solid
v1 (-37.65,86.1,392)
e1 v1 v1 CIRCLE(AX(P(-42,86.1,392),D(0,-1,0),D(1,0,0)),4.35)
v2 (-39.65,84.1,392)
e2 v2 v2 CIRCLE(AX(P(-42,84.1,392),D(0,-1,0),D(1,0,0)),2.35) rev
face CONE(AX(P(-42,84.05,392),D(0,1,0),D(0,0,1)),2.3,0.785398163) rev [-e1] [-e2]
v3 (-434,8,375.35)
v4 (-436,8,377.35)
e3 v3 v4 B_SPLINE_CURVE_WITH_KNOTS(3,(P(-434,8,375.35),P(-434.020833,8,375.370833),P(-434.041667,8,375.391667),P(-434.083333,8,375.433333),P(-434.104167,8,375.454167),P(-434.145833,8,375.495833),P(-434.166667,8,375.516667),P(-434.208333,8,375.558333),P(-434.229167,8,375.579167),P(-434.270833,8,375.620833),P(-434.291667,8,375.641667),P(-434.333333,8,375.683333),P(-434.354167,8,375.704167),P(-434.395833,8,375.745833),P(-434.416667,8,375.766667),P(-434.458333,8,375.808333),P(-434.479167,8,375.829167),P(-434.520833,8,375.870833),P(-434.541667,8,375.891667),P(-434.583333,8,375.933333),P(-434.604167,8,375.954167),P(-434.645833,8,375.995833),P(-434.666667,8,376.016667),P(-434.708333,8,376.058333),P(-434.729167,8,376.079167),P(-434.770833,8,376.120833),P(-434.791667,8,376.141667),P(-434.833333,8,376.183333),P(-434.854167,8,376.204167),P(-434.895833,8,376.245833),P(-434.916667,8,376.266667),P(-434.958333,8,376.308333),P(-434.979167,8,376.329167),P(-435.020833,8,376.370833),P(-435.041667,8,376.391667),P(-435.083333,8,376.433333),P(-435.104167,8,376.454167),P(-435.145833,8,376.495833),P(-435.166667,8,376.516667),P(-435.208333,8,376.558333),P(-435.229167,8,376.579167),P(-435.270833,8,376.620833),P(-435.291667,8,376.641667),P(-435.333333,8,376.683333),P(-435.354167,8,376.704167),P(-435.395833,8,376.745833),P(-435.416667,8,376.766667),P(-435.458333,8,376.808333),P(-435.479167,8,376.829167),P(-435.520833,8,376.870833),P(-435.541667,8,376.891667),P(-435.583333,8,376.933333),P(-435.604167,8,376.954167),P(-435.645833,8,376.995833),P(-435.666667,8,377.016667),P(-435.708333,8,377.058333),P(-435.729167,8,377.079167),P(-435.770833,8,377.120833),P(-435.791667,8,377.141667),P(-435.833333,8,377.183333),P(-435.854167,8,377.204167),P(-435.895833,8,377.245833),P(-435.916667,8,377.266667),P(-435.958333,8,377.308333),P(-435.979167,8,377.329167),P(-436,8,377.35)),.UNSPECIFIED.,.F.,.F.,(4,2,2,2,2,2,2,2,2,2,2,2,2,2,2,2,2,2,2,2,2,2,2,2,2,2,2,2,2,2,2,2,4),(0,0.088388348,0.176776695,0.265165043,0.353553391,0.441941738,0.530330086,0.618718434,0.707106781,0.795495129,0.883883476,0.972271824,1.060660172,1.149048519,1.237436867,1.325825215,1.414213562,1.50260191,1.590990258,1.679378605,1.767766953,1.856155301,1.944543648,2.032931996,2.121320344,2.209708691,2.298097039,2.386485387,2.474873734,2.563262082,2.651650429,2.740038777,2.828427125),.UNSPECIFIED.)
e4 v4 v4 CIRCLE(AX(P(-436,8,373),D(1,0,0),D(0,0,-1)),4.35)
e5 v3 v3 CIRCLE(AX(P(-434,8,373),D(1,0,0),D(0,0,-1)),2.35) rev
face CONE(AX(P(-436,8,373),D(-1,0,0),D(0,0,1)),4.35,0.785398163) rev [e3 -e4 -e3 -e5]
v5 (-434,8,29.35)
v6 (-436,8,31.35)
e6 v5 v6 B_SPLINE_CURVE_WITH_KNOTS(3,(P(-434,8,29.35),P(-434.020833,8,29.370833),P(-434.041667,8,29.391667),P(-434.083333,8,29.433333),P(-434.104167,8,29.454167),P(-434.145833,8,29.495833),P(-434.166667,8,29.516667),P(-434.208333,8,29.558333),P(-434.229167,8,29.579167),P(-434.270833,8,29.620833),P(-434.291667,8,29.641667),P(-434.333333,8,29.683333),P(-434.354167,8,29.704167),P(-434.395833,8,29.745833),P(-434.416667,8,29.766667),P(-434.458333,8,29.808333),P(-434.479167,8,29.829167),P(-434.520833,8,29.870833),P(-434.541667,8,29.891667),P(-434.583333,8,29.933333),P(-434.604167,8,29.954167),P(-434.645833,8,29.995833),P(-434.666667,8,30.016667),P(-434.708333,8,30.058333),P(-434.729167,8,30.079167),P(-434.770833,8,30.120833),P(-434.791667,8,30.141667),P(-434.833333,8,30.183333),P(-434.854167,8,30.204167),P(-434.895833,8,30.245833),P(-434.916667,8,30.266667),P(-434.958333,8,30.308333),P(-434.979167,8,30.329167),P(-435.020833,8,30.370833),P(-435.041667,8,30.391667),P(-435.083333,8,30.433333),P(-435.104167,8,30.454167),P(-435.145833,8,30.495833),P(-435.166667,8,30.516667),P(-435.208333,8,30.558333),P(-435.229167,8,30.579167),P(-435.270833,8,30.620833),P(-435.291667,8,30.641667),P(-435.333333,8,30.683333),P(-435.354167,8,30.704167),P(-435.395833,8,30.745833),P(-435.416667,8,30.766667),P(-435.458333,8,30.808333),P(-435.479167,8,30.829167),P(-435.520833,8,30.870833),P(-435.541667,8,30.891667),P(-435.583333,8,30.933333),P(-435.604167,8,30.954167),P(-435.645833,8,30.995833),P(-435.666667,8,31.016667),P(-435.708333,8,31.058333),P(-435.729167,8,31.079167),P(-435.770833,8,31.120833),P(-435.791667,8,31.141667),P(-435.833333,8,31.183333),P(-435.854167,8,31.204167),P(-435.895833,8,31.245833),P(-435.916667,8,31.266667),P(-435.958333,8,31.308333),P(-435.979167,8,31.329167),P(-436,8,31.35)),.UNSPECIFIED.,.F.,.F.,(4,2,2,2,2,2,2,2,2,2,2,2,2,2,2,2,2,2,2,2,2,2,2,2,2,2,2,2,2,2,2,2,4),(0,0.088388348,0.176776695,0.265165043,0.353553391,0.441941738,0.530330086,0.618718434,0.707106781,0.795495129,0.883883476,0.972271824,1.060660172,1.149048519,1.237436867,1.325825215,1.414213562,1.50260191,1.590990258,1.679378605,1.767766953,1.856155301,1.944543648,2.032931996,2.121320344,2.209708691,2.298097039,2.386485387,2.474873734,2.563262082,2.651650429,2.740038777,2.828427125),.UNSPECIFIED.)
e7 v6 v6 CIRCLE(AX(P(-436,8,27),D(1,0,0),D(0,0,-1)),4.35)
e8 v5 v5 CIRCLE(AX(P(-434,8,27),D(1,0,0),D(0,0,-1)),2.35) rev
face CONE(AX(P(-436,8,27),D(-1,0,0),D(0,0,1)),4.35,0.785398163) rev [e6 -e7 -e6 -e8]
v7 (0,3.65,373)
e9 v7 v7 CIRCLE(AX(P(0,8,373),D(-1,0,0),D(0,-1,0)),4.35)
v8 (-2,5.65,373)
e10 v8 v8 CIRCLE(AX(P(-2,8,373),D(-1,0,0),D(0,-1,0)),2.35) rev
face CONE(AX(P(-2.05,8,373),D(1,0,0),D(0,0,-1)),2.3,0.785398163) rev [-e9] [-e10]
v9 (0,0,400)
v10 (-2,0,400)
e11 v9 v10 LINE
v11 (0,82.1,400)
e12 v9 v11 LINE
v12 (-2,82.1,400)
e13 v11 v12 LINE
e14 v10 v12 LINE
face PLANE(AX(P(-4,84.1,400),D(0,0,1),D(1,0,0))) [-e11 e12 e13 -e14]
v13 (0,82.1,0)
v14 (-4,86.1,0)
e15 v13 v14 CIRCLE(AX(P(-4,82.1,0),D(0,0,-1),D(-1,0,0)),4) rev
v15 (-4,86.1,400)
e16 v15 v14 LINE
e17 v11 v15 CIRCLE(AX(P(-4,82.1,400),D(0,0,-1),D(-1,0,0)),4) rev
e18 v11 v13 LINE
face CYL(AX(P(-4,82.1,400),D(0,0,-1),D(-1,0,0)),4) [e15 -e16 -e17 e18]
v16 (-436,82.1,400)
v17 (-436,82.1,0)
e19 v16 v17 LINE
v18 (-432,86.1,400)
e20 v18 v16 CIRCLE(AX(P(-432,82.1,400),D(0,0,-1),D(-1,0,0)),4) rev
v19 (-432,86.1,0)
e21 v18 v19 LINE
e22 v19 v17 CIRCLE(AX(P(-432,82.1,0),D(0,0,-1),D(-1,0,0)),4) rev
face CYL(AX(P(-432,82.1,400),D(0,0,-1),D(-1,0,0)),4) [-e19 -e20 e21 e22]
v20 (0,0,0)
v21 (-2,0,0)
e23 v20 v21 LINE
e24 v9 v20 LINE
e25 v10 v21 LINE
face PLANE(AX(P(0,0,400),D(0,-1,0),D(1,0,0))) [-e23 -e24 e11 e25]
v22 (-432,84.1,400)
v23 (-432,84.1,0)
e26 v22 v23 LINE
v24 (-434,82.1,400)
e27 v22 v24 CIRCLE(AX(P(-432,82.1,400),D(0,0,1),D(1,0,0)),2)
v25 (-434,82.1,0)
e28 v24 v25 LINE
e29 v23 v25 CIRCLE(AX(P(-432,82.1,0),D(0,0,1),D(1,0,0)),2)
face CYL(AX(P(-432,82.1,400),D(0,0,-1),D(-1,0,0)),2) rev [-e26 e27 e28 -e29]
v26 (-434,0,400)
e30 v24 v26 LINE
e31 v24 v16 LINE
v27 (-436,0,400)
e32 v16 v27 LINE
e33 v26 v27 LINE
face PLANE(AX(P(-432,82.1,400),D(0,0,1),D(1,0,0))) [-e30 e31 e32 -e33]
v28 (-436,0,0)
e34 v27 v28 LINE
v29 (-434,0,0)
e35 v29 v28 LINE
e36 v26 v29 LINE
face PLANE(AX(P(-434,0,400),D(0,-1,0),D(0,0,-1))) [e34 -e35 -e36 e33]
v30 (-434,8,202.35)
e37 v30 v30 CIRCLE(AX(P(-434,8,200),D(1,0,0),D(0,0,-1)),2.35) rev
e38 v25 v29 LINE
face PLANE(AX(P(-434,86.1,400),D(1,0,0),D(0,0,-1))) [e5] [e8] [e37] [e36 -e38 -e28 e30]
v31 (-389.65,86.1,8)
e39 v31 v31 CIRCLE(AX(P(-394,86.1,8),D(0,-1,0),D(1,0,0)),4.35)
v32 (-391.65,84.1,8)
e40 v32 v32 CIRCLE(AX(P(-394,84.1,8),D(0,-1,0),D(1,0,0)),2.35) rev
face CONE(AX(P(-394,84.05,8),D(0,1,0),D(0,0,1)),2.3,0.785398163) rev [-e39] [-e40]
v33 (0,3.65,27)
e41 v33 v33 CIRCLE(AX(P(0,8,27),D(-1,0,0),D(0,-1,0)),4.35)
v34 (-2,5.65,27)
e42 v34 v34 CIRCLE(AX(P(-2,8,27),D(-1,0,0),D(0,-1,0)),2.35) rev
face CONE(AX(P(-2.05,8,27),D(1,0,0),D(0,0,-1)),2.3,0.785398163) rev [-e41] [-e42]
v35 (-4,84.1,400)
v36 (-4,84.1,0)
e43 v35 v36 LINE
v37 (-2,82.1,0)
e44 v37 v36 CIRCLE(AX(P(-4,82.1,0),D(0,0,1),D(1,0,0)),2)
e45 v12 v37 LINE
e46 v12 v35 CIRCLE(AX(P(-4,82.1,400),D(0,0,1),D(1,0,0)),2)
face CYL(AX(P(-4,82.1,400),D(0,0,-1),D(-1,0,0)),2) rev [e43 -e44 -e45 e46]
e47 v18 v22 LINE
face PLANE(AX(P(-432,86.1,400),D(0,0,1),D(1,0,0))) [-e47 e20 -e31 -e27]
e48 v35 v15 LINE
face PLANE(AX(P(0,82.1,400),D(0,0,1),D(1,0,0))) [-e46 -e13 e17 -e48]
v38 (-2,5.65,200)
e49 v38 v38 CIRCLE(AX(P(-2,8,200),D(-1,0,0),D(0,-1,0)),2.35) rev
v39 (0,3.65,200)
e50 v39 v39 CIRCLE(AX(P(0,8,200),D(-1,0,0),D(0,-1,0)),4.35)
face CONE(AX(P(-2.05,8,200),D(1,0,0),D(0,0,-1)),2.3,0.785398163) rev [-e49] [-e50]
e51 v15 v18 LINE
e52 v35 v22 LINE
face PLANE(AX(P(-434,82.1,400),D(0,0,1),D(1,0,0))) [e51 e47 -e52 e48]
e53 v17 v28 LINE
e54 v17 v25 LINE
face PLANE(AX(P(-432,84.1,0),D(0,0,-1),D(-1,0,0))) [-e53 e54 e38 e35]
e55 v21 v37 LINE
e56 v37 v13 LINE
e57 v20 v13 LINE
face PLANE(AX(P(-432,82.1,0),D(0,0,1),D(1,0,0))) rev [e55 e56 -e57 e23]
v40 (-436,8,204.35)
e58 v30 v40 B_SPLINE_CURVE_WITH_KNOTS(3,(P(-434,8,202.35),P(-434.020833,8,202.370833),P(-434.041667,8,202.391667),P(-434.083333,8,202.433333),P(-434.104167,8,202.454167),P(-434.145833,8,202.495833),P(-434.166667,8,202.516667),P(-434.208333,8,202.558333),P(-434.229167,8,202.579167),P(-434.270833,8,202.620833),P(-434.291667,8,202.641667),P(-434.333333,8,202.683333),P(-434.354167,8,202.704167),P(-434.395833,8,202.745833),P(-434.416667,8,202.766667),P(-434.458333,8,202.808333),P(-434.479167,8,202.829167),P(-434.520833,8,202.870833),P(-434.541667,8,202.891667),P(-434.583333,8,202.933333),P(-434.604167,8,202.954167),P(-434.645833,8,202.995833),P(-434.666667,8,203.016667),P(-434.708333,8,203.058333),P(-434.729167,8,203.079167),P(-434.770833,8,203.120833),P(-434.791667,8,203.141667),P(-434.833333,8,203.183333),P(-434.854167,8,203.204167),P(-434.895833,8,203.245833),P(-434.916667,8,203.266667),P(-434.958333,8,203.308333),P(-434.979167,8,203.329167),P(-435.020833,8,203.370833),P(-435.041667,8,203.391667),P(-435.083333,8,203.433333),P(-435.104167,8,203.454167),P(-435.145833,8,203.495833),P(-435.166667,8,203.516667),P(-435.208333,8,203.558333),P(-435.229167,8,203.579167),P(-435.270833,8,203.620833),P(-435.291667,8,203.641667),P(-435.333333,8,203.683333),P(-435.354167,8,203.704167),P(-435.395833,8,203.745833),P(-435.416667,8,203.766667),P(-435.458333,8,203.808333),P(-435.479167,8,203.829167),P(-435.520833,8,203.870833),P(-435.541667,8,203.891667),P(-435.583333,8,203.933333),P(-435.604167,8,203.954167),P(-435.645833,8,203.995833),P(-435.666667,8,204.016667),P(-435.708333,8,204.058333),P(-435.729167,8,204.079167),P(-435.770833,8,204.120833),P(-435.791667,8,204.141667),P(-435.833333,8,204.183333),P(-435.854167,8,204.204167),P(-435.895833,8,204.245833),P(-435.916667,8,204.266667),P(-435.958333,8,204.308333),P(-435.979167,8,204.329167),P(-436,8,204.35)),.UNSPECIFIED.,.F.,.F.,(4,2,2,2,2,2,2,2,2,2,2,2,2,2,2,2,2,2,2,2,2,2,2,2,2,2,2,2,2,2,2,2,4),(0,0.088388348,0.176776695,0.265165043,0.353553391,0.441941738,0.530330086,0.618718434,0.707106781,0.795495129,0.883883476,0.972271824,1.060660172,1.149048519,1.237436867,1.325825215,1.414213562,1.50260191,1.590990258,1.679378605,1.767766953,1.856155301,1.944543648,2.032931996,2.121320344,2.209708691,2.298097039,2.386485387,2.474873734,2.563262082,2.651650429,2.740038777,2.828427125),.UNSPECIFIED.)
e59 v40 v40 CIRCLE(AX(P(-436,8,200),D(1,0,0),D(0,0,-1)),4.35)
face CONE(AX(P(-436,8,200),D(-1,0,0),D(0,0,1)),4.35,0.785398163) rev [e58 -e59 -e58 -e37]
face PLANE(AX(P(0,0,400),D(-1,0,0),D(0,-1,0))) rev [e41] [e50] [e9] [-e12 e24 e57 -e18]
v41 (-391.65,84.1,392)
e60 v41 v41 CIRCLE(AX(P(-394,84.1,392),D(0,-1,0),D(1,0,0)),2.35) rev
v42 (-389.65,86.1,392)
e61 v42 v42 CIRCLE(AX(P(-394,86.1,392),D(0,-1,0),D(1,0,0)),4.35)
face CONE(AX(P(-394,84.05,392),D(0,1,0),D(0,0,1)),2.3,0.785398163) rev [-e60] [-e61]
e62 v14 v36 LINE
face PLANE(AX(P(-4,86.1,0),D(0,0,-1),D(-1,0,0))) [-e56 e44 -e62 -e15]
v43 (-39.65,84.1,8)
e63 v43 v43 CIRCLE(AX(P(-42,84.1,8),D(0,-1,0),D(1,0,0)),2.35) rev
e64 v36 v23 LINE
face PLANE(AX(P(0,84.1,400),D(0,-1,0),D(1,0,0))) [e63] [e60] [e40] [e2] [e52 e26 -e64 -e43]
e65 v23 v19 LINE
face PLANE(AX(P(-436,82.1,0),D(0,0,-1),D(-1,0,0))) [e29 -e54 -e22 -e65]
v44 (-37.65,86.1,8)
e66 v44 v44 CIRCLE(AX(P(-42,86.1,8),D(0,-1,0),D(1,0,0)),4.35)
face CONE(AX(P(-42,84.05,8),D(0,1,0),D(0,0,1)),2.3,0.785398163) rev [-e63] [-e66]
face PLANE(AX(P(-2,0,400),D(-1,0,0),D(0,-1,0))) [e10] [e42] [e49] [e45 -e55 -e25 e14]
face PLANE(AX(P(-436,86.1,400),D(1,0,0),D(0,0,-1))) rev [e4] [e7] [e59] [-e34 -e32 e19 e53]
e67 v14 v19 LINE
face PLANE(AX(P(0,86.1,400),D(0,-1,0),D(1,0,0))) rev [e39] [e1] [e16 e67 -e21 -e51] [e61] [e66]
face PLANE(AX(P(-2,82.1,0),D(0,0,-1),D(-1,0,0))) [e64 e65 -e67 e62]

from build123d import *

# Parameters (mm, degrees)
SM_BASE_FLANGE_1_DEPTH = 400
SKETCH_8_R             = 2.3
CUT_EXTRUDE_2_DEPTH    = 598.920738894
SKETCH_9_R             = 2.3
CUT_EXTRUDE_3_DEPTH    = 10
CHAMFER_1_SIZE         = 2.05


# Sheet-metal steps are written as plain solids
with BuildPart() as part:
    # Sketch 1 → Базовая кромка1 (new body)
    with BuildSketch(Plane.XY):
        with BuildLine():
            Line((0, 0), (0, 82.1))
            ThreePointArc((0, 82.1), (-1.171572875, 84.928427125), (-4, 86.1))
            Line((-4, 86.1), (-432, 86.1))
            ThreePointArc((-432, 86.1), (-434.828427125, 84.928427125), (-436, 82.1))
            Line((-436, 82.1), (-436, 0))
            Line((-436, 0), (-434, 0))
            Line((-434, 0), (-434, 82.1))
            ThreePointArc((-434, 82.1), (-433.414213562, 83.514213562), (-432, 84.1))
            Line((-432, 84.1), (-4, 84.1))
            ThreePointArc((-4, 84.1), (-2.585786438, 83.514213562), (-2, 82.1))
            Line((-2, 82.1), (-2, 0))
            Line((-2, 0), (0, 0))
        make_face()
    extrude(amount=SM_BASE_FLANGE_1_DEPTH)

    # Эскиз8 → Вырез-Вытянуть2 (cut, through all)
    with BuildSketch(Plane(origin=(0, 0, 0), x_dir=(0, 0, -1), z_dir=(1, 0, 0))):
        with Locations(Location((-373, 8, 0), (0, 0, 90))):
            Circle(SKETCH_8_R)
        with Locations(Location((-200, 8, 0), (0, 0, 90))):
            Circle(SKETCH_8_R)
        with Locations(Location((-27, 8, 0), (0, 0, 90))):
            Circle(SKETCH_8_R)
    extrude(amount=-CUT_EXTRUDE_2_DEPTH, mode=Mode.SUBTRACT)

    # Эскиз9 → Вырез-Вытянуть3 (cut)
    with BuildSketch(Plane(origin=(0, 86.1, 0), x_dir=(1, 0, 0), z_dir=(0, 1, 0))):
        with Locations(Location((-42, -392, 0), (0, 0, 180))):
            Circle(SKETCH_9_R)
        with Locations(Location((-394, -392, 0), (0, 0, 180))):
            Circle(SKETCH_9_R)
        with Locations(Location((-42, -8, 0), (0, 0, 180))):
            Circle(SKETCH_9_R)
        with Locations(Location((-394, -8, 0), (0, 0, 180))):
            Circle(SKETCH_9_R)
    extrude(amount=-CUT_EXTRUDE_3_DEPTH, mode=Mode.SUBTRACT)

    # Фаска1
    # the kernel refuses this chamfer: 2.05 mm, written as the material it takes off along each edge
    with BuildSketch(Plane(origin=(-436, 8, 373), x_dir=(0, 1, 0), z_dir=(0, 0, -1))) as chamfer_1_piece_1:
        Polygon((2.3 + CHAMFER_1_SIZE, 0), (2.3, CHAMFER_1_SIZE), (2.3, 0), align=None)
    revolve(axis=Axis((-436, 8, 373), (1, 0, 0)), mode=Mode.SUBTRACT)
    with BuildSketch(Plane(origin=(0, 8, 373), x_dir=(0, 1, 0), z_dir=(0, 0, -1))) as chamfer_1_piece_2:
        Polygon((2.3, -CHAMFER_1_SIZE), (2.3 + CHAMFER_1_SIZE, 0), (2.3, 0), align=None)
    revolve(axis=Axis((0, 8, 373), (1, 0, 0)), mode=Mode.SUBTRACT)
    with BuildSketch(Plane(origin=(-436, 8, 200), x_dir=(0, 1, 0), z_dir=(0, 0, -1))) as chamfer_1_piece_3:
        Polygon((2.3 + CHAMFER_1_SIZE, 0), (2.3, CHAMFER_1_SIZE), (2.3, 0), align=None)
    revolve(axis=Axis((-436, 8, 200), (1, 0, 0)), mode=Mode.SUBTRACT)
    with BuildSketch(Plane(origin=(0, 8, 200), x_dir=(0, 1, 0), z_dir=(0, 0, -1))) as chamfer_1_piece_4:
        Polygon((2.3, -CHAMFER_1_SIZE), (2.3 + CHAMFER_1_SIZE, 0), (2.3, 0), align=None)
    revolve(axis=Axis((0, 8, 200), (1, 0, 0)), mode=Mode.SUBTRACT)
    with BuildSketch(Plane(origin=(-436, 8, 27), x_dir=(0, 1, 0), z_dir=(0, 0, -1))) as chamfer_1_piece_5:
        Polygon((2.3 + CHAMFER_1_SIZE, 0), (2.3, CHAMFER_1_SIZE), (2.3, 0), align=None)
    revolve(axis=Axis((-436, 8, 27), (1, 0, 0)), mode=Mode.SUBTRACT)
    with BuildSketch(Plane(origin=(0, 8, 27), x_dir=(0, 1, 0), z_dir=(0, 0, -1))) as chamfer_1_piece_6:
        Polygon((2.3, -CHAMFER_1_SIZE), (2.3 + CHAMFER_1_SIZE, 0), (2.3, 0), align=None)
    revolve(axis=Axis((0, 8, 27), (1, 0, 0)), mode=Mode.SUBTRACT)
    with BuildSketch(Plane(origin=(-42, 86.1, 392), x_dir=(-1, 0, 0), z_dir=(0, 0, -1))) as chamfer_1_piece_7:
        Polygon((2.3, -CHAMFER_1_SIZE), (2.3 + CHAMFER_1_SIZE, 0), (2.3, 0), align=None)
    revolve(axis=Axis((-42, 86.1, 392), (0, 1, 0)), mode=Mode.SUBTRACT)
    with BuildSketch(Plane(origin=(-394, 86.1, 392), x_dir=(-1, 0, 0), z_dir=(0, 0, -1))) as chamfer_1_piece_8:
        Polygon((2.3, -CHAMFER_1_SIZE), (2.3 + CHAMFER_1_SIZE, 0), (2.3, 0), align=None)
    revolve(axis=Axis((-394, 86.1, 392), (0, 1, 0)), mode=Mode.SUBTRACT)
    with BuildSketch(Plane(origin=(-42, 86.1, 8), x_dir=(-1, 0, 0), z_dir=(0, 0, -1))) as chamfer_1_piece_9:
        Polygon((2.3, -CHAMFER_1_SIZE), (2.3 + CHAMFER_1_SIZE, 0), (2.3, 0), align=None)
    revolve(axis=Axis((-42, 86.1, 8), (0, 1, 0)), mode=Mode.SUBTRACT)
    with BuildSketch(Plane(origin=(-394, 86.1, 8), x_dir=(-1, 0, 0), z_dir=(0, 0, -1))) as chamfer_1_piece_10:
        Polygon((2.3, -CHAMFER_1_SIZE), (2.3 + CHAMFER_1_SIZE, 0), (2.3, 0), align=None)
    revolve(axis=Axis((-394, 86.1, 8), (0, 1, 0)), mode=Mode.SUBTRACT)


solid = part.part
